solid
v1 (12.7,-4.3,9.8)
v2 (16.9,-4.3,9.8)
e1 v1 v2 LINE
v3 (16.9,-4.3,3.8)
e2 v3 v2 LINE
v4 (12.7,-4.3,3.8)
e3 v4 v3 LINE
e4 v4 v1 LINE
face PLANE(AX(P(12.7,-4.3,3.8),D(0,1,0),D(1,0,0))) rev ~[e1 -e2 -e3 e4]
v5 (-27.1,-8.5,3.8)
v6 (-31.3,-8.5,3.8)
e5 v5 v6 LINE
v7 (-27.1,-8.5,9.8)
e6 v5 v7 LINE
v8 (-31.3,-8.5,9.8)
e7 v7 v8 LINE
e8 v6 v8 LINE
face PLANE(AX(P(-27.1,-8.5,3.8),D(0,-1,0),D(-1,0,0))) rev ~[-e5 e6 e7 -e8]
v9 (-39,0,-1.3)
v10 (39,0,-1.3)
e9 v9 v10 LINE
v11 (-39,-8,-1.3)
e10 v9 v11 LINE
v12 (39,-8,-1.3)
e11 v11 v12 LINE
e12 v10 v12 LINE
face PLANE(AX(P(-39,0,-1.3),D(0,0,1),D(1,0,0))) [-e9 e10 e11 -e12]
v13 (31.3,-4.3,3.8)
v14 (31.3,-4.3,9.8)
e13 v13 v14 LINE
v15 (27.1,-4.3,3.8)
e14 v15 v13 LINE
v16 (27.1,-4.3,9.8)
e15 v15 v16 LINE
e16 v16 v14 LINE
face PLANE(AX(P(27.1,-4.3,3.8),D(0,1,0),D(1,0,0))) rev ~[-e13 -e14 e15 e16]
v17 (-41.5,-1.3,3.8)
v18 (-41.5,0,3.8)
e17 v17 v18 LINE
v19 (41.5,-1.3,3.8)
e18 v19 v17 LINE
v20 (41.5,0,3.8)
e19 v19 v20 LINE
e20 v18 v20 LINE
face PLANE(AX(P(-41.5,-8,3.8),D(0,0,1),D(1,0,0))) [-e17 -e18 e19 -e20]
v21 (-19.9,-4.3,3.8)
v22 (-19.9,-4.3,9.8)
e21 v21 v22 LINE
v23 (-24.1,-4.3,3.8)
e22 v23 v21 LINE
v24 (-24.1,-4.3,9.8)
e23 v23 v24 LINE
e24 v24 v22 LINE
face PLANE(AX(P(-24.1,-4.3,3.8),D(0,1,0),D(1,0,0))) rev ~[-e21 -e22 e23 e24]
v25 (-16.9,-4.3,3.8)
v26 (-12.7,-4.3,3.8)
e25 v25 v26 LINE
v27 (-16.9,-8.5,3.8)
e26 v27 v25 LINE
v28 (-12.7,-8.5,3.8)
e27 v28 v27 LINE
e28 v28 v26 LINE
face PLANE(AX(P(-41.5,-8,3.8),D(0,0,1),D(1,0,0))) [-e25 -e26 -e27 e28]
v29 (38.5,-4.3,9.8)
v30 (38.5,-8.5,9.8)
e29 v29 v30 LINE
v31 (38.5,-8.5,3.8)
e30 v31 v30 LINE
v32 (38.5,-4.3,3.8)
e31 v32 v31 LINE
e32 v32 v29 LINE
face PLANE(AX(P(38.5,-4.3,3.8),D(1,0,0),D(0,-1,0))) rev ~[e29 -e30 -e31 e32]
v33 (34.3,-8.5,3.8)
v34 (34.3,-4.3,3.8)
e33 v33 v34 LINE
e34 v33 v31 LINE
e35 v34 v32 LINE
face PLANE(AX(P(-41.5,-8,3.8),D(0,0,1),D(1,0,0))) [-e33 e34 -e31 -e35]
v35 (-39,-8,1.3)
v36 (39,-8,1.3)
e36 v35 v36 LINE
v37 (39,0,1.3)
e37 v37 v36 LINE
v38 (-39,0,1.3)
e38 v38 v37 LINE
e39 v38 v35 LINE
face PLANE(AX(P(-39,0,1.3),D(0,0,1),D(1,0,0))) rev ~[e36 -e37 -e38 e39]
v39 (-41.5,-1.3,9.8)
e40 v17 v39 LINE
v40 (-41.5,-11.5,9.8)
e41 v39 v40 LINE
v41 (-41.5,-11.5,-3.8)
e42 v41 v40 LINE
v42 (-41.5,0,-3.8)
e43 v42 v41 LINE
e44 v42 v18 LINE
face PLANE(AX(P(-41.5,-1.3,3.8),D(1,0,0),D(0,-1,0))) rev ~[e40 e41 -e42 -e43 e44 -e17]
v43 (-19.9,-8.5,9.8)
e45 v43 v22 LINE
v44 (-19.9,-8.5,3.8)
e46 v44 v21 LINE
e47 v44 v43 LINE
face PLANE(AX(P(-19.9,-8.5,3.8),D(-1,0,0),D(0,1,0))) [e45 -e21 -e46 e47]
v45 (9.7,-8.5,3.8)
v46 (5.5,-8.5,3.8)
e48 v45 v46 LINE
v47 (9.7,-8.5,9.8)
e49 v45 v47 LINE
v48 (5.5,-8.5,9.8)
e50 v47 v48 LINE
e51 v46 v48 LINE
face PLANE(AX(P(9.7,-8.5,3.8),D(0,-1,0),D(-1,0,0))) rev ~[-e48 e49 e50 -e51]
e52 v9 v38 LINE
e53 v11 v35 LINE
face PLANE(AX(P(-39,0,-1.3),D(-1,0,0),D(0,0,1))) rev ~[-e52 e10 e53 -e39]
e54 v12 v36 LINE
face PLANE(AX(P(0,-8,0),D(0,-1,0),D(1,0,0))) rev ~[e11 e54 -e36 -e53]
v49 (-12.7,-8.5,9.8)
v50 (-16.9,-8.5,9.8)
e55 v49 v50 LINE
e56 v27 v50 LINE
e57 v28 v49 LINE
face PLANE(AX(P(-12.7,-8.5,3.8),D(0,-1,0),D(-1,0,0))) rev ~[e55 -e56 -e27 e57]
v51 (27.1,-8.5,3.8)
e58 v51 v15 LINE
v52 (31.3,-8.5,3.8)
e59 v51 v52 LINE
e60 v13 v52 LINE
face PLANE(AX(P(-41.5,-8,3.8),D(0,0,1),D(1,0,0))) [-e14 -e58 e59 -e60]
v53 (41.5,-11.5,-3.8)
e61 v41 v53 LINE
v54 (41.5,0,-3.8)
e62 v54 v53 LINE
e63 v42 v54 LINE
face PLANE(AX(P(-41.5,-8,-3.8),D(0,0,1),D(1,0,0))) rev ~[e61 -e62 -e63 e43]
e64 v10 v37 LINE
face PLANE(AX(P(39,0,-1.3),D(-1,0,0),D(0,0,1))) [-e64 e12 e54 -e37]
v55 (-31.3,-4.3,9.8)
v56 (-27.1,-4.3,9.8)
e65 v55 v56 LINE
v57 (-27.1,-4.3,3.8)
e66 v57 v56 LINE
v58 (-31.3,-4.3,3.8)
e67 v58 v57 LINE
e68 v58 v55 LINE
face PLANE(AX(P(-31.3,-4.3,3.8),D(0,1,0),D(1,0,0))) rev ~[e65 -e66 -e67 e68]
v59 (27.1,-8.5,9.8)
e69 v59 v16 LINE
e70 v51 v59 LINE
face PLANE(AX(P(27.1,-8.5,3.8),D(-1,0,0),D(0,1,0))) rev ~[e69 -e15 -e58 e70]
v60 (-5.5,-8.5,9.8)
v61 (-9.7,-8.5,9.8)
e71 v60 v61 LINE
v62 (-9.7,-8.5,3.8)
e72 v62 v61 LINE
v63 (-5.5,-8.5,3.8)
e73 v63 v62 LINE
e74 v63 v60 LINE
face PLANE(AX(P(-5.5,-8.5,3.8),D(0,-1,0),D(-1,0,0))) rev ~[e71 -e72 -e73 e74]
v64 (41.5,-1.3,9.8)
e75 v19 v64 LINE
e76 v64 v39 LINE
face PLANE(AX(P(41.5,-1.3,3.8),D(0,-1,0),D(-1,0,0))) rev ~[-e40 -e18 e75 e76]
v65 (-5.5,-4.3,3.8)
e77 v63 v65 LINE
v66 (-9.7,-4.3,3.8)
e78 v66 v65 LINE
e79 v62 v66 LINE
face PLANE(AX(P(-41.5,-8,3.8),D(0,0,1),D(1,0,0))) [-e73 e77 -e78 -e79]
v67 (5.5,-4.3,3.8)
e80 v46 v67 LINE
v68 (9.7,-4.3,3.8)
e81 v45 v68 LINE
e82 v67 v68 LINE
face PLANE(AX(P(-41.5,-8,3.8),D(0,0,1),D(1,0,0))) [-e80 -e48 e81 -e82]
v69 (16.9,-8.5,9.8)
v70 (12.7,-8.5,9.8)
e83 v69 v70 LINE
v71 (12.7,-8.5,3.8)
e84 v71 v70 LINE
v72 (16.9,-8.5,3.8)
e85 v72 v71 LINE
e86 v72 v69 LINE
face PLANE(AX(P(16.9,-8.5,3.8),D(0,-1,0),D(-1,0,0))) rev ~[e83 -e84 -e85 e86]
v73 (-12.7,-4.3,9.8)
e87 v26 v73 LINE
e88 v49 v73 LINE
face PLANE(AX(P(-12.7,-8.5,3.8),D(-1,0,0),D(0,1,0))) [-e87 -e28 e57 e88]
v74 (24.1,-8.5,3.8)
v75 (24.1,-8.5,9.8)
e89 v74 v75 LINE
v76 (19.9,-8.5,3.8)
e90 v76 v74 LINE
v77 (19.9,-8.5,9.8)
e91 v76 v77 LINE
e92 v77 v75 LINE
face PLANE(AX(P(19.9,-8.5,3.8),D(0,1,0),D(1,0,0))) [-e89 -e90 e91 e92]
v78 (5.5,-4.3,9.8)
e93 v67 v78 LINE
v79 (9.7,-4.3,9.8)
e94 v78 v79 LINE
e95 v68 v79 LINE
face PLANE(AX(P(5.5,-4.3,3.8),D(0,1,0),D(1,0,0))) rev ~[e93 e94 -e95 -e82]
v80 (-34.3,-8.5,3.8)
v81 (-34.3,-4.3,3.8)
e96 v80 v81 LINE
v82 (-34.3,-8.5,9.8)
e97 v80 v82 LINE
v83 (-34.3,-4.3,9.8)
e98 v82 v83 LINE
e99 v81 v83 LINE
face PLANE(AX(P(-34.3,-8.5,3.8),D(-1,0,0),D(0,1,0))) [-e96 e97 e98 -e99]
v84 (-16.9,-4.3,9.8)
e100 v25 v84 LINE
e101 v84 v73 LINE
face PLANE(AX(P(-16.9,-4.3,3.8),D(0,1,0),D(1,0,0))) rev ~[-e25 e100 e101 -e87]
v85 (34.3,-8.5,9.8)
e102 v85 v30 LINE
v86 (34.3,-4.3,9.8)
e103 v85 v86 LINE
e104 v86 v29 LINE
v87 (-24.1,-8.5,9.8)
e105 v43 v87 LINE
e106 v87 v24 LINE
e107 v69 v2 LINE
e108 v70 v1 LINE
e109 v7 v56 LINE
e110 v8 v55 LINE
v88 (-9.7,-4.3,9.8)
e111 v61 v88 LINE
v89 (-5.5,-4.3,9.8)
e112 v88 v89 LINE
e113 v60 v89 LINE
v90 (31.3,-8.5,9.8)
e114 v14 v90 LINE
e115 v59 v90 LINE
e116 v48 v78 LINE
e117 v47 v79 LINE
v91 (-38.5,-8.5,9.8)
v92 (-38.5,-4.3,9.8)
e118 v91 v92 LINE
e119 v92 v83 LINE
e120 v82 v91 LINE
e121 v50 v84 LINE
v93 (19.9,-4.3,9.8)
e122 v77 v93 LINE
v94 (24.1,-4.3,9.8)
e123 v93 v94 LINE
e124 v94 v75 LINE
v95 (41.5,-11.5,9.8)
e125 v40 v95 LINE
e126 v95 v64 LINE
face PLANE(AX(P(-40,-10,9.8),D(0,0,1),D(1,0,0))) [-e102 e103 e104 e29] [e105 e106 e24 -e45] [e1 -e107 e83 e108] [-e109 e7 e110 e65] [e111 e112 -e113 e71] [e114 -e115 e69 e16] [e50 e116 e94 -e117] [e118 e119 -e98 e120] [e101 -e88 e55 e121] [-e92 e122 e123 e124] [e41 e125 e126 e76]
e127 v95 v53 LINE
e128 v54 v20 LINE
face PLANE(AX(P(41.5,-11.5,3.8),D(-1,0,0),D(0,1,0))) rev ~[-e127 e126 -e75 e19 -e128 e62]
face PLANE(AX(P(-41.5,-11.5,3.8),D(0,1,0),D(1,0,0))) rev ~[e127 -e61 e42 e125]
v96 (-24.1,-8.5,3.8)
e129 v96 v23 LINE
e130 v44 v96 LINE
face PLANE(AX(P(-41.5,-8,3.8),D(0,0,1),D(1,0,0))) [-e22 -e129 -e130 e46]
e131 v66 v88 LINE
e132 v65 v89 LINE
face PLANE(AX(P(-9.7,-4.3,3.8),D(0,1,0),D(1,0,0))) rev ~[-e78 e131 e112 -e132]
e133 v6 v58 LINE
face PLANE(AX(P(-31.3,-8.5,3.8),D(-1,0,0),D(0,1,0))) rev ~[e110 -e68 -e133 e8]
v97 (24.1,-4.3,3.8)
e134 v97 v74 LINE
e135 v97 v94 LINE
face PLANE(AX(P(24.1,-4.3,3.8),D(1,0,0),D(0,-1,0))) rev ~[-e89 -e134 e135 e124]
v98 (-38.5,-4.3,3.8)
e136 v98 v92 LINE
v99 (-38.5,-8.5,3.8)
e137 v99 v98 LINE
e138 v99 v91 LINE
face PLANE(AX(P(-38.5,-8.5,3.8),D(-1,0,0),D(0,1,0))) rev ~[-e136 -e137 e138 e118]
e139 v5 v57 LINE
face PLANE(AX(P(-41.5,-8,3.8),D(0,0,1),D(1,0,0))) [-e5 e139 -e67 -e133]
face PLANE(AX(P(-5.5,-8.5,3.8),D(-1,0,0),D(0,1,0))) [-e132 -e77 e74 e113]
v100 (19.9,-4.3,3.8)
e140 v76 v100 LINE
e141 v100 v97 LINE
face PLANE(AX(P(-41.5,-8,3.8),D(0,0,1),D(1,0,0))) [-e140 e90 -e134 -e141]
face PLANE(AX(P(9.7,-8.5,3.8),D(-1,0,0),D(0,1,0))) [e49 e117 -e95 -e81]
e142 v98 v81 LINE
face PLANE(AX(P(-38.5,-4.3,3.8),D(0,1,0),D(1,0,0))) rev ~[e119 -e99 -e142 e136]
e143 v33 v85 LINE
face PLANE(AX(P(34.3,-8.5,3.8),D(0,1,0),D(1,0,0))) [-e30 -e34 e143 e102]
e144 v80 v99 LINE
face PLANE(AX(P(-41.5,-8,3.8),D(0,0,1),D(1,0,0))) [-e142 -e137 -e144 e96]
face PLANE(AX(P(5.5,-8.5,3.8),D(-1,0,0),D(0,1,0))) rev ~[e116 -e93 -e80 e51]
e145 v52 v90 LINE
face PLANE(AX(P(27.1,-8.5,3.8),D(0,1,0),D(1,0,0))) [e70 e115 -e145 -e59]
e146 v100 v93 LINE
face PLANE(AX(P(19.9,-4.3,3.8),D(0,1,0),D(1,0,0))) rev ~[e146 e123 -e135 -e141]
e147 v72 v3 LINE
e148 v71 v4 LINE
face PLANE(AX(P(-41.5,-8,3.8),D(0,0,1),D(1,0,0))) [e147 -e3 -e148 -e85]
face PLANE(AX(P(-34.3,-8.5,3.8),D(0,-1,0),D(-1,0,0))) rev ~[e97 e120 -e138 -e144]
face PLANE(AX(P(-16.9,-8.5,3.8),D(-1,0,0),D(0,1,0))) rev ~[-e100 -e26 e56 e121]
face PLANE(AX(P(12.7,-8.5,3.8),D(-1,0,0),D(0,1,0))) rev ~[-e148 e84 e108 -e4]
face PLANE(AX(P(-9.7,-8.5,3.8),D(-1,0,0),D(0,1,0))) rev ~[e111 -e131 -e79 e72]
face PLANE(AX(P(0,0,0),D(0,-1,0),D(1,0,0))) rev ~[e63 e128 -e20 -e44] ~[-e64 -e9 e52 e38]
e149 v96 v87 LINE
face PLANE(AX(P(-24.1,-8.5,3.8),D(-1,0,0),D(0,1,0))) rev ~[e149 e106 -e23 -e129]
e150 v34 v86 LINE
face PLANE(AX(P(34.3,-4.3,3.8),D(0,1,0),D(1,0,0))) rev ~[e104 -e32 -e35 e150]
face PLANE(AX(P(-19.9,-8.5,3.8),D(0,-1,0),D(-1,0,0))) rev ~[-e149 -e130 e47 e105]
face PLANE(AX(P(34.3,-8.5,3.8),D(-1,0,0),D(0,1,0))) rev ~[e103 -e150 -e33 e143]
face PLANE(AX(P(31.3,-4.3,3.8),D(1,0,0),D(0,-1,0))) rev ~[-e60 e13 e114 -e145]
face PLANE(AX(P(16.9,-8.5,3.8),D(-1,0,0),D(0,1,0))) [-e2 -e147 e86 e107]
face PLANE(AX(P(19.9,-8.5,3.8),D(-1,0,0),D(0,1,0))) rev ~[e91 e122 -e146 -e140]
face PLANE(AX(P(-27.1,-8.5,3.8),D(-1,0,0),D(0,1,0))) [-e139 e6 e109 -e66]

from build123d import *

# Parameters (mm, degrees)
F0_W     = 83
F0_H     = 7.6
F0_W_2   = 78
F0_H_2   = 2.6
F1_DEPTH = 8
F2_W     = 83
F2_H     = 7.6
F2_W_2   = 78
F2_H_2   = 2.6
F3_DEPTH = 3.5
F4_W     = 3
F4_H     = 3
F4_W_2   = 4.2
F4_H_2   = 4.2
F4_W_3   = 11
F5_DEPTH = 6


with BuildPart() as f1:
    # F0 (on Front) → F1 (new body)
    with BuildSketch(Plane.XZ):
        Rectangle(F0_W, F0_H)
        Rectangle(F0_W_2, F0_H_2, mode=Mode.SUBTRACT)
    extrude(amount=F1_DEPTH)

    # F2 (on face) → F3 (join)
    with BuildSketch(Plane.XZ.offset(8)):
        Rectangle(F2_W, F2_H)
        Rectangle(F2_W_2, F2_H_2, mode=Mode.SUBTRACT)
        Rectangle(F2_W_2, F2_H_2)
    extrude(amount=F3_DEPTH)

    # F4 (on face) → F5 (join)
    with BuildSketch(Plane.XY.offset(3.8)):
        with Locations((-40, -10)):
            Rectangle(F4_W, F4_H)
        with Locations((-36.4, -10)):
            Rectangle(F4_W_2, F4_H)
        with Locations((-40, -6.4)):
            Rectangle(F4_W, F4_H_2)
        with Locations((-32.8, -10)):
            Rectangle(F4_W, F4_H)
        with Locations((-40, -2.8)):
            Rectangle(F4_W, F4_H)
        with Locations((-29.2, -10)):
            Rectangle(F4_W_2, F4_H)
        with Locations((-32.8, -6.4)):
            Rectangle(F4_W, F4_H_2)
        with Locations((-36.4, -2.8)):
            Rectangle(F4_W_2, F4_H)
        with Locations((-25.6, -10)):
            Rectangle(F4_W, F4_H)
        with Locations((-32.8, -2.8)):
            Rectangle(F4_W, F4_H)
        with Locations((-22, -10)):
            Rectangle(F4_W_2, F4_H)
        with Locations((-25.6, -6.4)):
            Rectangle(F4_W, F4_H_2)
        with Locations((-29.2, -2.8)):
            Rectangle(F4_W_2, F4_H)
        with Locations((-18.4, -10)):
            Rectangle(F4_W, F4_H)
        with Locations((-25.6, -2.8)):
            Rectangle(F4_W, F4_H)
        with Locations((40, -2.8)):
            Rectangle(F4_W, F4_H)
        with Locations((-14.8, -10)):
            Rectangle(F4_W_2, F4_H)
        with Locations((-18.4, -6.4)):
            Rectangle(F4_W, F4_H_2)
        with Locations((-22, -2.8)):
            Rectangle(F4_W_2, F4_H)
        with Locations((36.4, -2.8)):
            Rectangle(F4_W_2, F4_H)
        with Locations((40, -6.4)):
            Rectangle(F4_W, F4_H_2)
        with Locations((-11.2, -10)):
            Rectangle(F4_W, F4_H)
        with Locations((-18.4, -2.8)):
            Rectangle(F4_W, F4_H)
        with Locations((32.8, -2.8)):
            Rectangle(F4_W, F4_H)
        with Locations((40, -10)):
            Rectangle(F4_W, F4_H)
        with Locations((-7.6, -10)):
            Rectangle(F4_W_2, F4_H)
        with Locations((-11.2, -6.4)):
            Rectangle(F4_W, F4_H_2)
        with Locations((-14.8, -2.8)):
            Rectangle(F4_W_2, F4_H)
        with Locations((29.2, -2.8)):
            Rectangle(F4_W_2, F4_H)
        with Locations((32.8, -6.4)):
            Rectangle(F4_W, F4_H_2)
        with Locations((36.4, -10)):
            Rectangle(F4_W_2, F4_H)
        with Locations((0, -10)):
            Rectangle(F4_W_3, F4_H)
        with Locations((-11.2, -2.8)):
            Rectangle(F4_W, F4_H)
        with Locations((25.6, -2.8)):
            Rectangle(F4_W, F4_H)
        with Locations((32.8, -10)):
            Rectangle(F4_W, F4_H)
        with Locations((7.6, -10)):
            Rectangle(F4_W_2, F4_H)
        with Locations((0, -6.4)):
            Rectangle(F4_W_3, F4_H_2)
        with Locations((-7.6, -2.8)):
            Rectangle(F4_W_2, F4_H)
        with Locations((22, -2.8)):
            Rectangle(F4_W_2, F4_H)
        with Locations((25.6, -6.4)):
            Rectangle(F4_W, F4_H_2)
        with Locations((29.2, -10)):
            Rectangle(F4_W_2, F4_H)
        with Locations((11.2, -10)):
            Rectangle(F4_W, F4_H)
        with Locations((0, -2.8)):
            Rectangle(F4_W_3, F4_H)
        with Locations((18.4, -2.8)):
            Rectangle(F4_W, F4_H)
        with Locations((25.6, -10)):
            Rectangle(F4_W, F4_H)
        with Locations((14.8, -10)):
            Rectangle(F4_W_2, F4_H)
        with Locations((11.2, -6.4)):
            Rectangle(F4_W, F4_H_2)
        with Locations((7.6, -2.8)):
            Rectangle(F4_W_2, F4_H)
        with Locations((14.8, -2.8)):
            Rectangle(F4_W_2, F4_H)
        with Locations((18.4, -6.4)):
            Rectangle(F4_W, F4_H_2)
        with Locations((22, -10)):
            Rectangle(F4_W_2, F4_H)
        with Locations((18.4, -10)):
            Rectangle(F4_W, F4_H)
        with Locations((11.2, -2.8)):
            Rectangle(F4_W, F4_H)
    extrude(amount=F5_DEPTH)


solid = f1.part
